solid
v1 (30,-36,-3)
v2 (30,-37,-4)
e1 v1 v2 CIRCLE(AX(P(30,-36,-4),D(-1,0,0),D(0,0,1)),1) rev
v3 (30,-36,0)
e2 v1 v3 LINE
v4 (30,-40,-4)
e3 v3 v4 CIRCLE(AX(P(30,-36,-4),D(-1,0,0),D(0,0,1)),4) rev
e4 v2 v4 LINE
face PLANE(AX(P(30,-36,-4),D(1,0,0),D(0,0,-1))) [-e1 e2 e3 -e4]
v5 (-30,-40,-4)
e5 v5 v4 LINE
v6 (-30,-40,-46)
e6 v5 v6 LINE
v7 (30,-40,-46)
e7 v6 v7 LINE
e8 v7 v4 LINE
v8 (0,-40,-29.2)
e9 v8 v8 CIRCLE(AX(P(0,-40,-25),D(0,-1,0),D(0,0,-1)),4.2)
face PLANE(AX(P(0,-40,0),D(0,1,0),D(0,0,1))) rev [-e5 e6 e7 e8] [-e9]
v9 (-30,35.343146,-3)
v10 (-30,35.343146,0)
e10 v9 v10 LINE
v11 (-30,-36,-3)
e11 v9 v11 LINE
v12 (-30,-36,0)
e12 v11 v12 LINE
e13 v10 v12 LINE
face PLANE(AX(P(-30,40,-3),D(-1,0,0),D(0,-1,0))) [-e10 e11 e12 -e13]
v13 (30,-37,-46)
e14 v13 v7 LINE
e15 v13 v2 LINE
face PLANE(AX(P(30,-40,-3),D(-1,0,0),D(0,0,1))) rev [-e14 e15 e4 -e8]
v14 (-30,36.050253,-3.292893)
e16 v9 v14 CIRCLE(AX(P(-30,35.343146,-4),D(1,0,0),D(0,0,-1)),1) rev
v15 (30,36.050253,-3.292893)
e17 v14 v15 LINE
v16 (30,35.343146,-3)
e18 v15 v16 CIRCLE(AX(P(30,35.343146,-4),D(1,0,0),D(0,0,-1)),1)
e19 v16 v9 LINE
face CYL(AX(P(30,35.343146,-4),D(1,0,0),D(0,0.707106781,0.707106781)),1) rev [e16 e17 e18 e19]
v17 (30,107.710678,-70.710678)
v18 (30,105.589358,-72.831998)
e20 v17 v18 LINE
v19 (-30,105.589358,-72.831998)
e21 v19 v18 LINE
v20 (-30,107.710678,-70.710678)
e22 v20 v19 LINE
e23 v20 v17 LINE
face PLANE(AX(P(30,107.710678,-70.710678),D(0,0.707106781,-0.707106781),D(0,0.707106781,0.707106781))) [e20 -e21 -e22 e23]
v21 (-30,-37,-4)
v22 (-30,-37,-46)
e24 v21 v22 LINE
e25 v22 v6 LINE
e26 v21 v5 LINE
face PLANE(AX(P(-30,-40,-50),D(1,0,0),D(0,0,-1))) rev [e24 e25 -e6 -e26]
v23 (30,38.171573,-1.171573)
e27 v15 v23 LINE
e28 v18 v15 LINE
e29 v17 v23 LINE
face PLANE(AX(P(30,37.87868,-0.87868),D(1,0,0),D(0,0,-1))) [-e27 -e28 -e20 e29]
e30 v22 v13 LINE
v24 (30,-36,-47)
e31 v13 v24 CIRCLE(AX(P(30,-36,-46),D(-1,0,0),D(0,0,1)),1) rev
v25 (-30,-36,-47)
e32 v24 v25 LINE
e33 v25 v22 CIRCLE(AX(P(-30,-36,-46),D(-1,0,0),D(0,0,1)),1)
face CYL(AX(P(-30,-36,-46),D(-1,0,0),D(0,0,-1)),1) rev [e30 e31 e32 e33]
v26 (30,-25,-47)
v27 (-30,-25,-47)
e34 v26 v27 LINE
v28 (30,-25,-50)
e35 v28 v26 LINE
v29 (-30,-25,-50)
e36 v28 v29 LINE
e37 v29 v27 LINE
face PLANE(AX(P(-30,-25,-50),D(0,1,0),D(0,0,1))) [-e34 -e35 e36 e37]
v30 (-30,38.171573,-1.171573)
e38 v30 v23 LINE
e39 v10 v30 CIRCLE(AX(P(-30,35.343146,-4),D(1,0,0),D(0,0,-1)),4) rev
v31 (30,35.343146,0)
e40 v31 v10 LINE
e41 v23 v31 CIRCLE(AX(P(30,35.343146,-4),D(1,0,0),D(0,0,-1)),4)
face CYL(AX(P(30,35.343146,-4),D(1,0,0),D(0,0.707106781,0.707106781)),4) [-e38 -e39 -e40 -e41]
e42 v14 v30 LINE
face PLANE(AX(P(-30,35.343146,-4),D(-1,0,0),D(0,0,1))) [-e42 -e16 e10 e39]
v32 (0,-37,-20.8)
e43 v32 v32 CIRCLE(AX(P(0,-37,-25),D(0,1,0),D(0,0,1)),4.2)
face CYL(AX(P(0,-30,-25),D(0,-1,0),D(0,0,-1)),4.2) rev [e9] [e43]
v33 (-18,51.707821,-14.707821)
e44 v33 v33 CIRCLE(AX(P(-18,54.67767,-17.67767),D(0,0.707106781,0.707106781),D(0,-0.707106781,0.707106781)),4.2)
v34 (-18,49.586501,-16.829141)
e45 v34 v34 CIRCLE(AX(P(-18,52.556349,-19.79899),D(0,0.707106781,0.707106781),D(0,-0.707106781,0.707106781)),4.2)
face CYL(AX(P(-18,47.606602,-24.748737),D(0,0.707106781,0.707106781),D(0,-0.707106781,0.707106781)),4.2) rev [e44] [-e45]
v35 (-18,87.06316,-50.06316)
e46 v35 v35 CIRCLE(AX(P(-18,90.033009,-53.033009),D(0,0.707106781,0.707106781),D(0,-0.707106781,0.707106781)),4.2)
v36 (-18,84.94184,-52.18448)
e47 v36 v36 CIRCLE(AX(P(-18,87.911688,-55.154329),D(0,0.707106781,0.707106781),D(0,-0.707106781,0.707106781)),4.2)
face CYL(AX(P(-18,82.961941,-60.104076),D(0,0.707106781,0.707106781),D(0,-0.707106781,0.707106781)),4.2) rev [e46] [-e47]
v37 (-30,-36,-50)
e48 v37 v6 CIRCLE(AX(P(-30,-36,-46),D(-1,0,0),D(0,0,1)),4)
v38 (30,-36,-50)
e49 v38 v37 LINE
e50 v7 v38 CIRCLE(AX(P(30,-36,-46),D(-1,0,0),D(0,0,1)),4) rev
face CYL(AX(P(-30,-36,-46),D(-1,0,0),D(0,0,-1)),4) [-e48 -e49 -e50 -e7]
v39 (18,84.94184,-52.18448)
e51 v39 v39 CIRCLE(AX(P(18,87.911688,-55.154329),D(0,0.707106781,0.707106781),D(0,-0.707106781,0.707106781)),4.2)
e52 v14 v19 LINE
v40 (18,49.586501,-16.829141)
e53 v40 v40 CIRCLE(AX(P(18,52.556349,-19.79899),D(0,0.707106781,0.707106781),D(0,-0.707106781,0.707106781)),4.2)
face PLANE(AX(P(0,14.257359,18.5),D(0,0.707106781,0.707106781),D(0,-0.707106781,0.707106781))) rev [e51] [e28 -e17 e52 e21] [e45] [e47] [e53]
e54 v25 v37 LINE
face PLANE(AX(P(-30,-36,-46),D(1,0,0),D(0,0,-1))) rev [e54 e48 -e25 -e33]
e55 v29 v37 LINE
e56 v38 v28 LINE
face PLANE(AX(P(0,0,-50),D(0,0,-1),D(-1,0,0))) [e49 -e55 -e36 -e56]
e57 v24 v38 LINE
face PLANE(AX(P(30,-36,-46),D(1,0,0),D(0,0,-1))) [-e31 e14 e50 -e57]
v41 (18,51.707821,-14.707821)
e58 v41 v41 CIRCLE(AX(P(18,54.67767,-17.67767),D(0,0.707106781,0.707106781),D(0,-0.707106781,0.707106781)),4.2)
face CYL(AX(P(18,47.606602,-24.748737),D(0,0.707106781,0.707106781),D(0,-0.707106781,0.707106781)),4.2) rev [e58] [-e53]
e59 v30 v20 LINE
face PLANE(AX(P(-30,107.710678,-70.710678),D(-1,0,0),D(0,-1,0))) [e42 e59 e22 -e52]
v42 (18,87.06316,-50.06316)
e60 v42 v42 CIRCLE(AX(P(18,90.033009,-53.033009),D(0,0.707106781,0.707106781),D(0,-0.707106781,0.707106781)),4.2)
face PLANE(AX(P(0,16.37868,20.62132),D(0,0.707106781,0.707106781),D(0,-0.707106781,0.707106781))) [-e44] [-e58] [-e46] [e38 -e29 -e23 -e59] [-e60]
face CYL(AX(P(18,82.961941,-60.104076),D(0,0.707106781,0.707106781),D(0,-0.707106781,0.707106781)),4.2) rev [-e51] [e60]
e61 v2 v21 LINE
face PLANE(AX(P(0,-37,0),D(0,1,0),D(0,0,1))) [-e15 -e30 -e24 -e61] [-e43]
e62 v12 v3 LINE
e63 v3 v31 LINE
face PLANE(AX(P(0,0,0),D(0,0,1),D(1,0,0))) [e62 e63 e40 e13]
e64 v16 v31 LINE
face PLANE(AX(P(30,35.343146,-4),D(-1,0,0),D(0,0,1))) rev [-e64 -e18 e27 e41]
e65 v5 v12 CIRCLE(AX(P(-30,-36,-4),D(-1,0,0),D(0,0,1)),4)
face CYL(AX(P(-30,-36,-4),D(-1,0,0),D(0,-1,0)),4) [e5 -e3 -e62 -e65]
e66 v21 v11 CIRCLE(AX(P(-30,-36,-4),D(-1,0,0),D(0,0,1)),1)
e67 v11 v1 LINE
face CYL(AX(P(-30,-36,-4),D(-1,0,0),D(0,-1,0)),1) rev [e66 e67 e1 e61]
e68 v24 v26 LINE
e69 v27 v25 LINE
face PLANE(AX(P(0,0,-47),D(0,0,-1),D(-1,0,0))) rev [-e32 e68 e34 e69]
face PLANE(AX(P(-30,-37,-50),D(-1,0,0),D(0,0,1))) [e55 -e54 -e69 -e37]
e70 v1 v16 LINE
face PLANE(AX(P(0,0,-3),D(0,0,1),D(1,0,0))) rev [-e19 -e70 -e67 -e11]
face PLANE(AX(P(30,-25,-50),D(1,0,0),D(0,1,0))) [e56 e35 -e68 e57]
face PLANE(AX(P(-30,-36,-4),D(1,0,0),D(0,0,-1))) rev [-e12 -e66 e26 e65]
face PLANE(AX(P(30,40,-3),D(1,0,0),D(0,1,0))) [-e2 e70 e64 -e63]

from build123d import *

# Parameters (mm, degrees)
SKETCH1_W                    = 60
SKETCH1_H                    = 80
BASE_FLANGE1_DEPTH           = 3
EDGE_FLANGE1_START           = -30
EDGE_FLANGE1_DEPTH           = 60
EDGE_FLANGE1_2_DEPTH         = 60
EDGE_FLANGE2_STRIP_W         = 14
EDGE_FLANGE2_STRIP_H         = 3
EDGE_FLANGE2_STRIP_CUT_DEPTH = 60
EDGE_FLANGE2_DEPTH           = 60
EDGE_FLANGE3_STRIP_W         = 14
EDGE_FLANGE3_STRIP_H         = 3
EDGE_FLANGE3_STRIP_CUT_DEPTH = 60
EDGE_FLANGE3_DEPTH           = 60
SKETCH17_R                   = 4.2
CUT_EXTRUDE1_DEPTH           = 10
SKETCH18_R                   = 4.2
CUT_EXTRUDE2_DEPTH           = 10


# Read off the part's stored shape, not the designer's step: Edge-Flange1
# Sheet-metal steps are written as plain solids
with BuildPart() as part:
    # Sketch1 → Base-Flange1 (new body)
    with BuildSketch(Plane.XY):
        Rectangle(SKETCH1_W, SKETCH1_H)
    extrude(amount=-BASE_FLANGE1_DEPTH)

    # Edge-Flange1 outline → Edge-Flange1 (cut)
    with BuildSketch(Plane.YZ.offset(EDGE_FLANGE1_START)):
        with BuildLine():
            ThreePointArc((35.343145751, 0), (36.87387948, -0.30448187), (38.171572875, -1.171572875))
            Line((38.171572875, -1.171572875), (40, -3))
            Line((40, -3), (40, 0))
            Line((40, 0), (35.343145751, 0))
        make_face()
    extrude(amount=EDGE_FLANGE1_DEPTH, mode=Mode.SUBTRACT)

    # Edge-Flange1 2 outline → Edge-Flange1 2 (add)
    with BuildSketch(Plane.YZ.offset(EDGE_FLANGE1_START)):
        with BuildLine():
            Line((107.710678119, -70.710678119), (40, -3))
            Line((40, -3), (35.343145751, -3))
            ThreePointArc((35.343145751, -3), (35.725829183, -3.076120467), (36.050252532, -3.292893219))
            Line((36.050252532, -3.292893219), (105.589357775, -72.831998462))
            Line((105.589357775, -72.831998462), (107.710678119, -70.710678119))
        make_face()
    extrude(amount=EDGE_FLANGE1_2_DEPTH)

    # Edge-Flange2 strip (across the edge) → Edge-Flange2 strip cut (cut)
    with BuildSketch(Plane(origin=(30, -40, -3), x_dir=(0, 1, 0), z_dir=(-1, 0, 0))):
        with Locations((-3, -1.5)):
            Rectangle(EDGE_FLANGE2_STRIP_W, EDGE_FLANGE2_STRIP_H)
    extrude(amount=EDGE_FLANGE2_STRIP_CUT_DEPTH, mode=Mode.SUBTRACT)

    # Edge-Flange2 section (across the edge) → Edge-Flange2 (add)
    with BuildSketch(Plane(origin=(30, -40, -3), x_dir=(0, 1, 0), z_dir=(-1, 0, 0))):
        with BuildLine():
            Line((0, 1), (0, 47))
            Line((0, 47), (3, 47))
            Line((3, 47), (3, 1))
            ThreePointArc((3, 1), (3.292893219, 0.292893219), (4, 0))
            Line((4, 0), (4, -3))
            ThreePointArc((4, -3), (1.171572875, -1.828427125), (0, 1))
        make_face()
    extrude(amount=EDGE_FLANGE2_DEPTH)

    # Edge-Flange3 strip (across the edge) → Edge-Flange3 strip cut (cut)
    with BuildSketch(Plane(origin=(30, -37, -50), x_dir=(0, 0, 1), z_dir=(-1, 0, 0))):
        with Locations((-3, -1.5)):
            Rectangle(EDGE_FLANGE3_STRIP_W, EDGE_FLANGE3_STRIP_H)
    extrude(amount=EDGE_FLANGE3_STRIP_CUT_DEPTH, mode=Mode.SUBTRACT)

    # Edge-Flange3 section (across the edge) → Edge-Flange3 (add)
    with BuildSketch(Plane(origin=(30, -37, -50), x_dir=(0, 0, 1), z_dir=(-1, 0, 0))):
        with BuildLine():
            Line((0, 1), (0, 12))
            Line((0, 12), (3, 12))
            Line((3, 12), (3, 1))
            ThreePointArc((3, 1), (3.292893219, 0.292893219), (4, 0))
            Line((4, 0), (4, -3))
            ThreePointArc((4, -3), (1.171572875, -1.828427125), (0, 1))
        make_face()
    extrude(amount=EDGE_FLANGE3_DEPTH)

    # Sketch17 → Cut-Extrude1 (cut)
    with BuildSketch(Plane.XZ.offset(40)):
        with Locations(Location((0, -25, 0), (0, 0, 270))):
            Circle(SKETCH17_R)
    extrude(amount=-CUT_EXTRUDE1_DEPTH, mode=Mode.SUBTRACT)

    # Sketch18 → Cut-Extrude2 (cut)
    with BuildSketch(Plane(origin=(0, 18.5, 18.5), x_dir=(1, 0, 0), z_dir=(0, 0.7071067811865438, 0.7071067811865513))):
        with Locations(Location((-18, 101.162950904, 0), (0, 0, 270))):
            Circle(SKETCH18_R)
        with Locations(Location((18, 101.162950904, 0), (0, 0, 270))):
            Circle(SKETCH18_R)
        with Locations(Location((18, 51.162950904, 0), (0, 0, 270))):
            Circle(SKETCH18_R)
        with Locations(Location((-18, 51.162950904, 0), (0, 0, 270))):
            Circle(SKETCH18_R)
    extrude(amount=-CUT_EXTRUDE2_DEPTH, mode=Mode.SUBTRACT)


solid = part.part
